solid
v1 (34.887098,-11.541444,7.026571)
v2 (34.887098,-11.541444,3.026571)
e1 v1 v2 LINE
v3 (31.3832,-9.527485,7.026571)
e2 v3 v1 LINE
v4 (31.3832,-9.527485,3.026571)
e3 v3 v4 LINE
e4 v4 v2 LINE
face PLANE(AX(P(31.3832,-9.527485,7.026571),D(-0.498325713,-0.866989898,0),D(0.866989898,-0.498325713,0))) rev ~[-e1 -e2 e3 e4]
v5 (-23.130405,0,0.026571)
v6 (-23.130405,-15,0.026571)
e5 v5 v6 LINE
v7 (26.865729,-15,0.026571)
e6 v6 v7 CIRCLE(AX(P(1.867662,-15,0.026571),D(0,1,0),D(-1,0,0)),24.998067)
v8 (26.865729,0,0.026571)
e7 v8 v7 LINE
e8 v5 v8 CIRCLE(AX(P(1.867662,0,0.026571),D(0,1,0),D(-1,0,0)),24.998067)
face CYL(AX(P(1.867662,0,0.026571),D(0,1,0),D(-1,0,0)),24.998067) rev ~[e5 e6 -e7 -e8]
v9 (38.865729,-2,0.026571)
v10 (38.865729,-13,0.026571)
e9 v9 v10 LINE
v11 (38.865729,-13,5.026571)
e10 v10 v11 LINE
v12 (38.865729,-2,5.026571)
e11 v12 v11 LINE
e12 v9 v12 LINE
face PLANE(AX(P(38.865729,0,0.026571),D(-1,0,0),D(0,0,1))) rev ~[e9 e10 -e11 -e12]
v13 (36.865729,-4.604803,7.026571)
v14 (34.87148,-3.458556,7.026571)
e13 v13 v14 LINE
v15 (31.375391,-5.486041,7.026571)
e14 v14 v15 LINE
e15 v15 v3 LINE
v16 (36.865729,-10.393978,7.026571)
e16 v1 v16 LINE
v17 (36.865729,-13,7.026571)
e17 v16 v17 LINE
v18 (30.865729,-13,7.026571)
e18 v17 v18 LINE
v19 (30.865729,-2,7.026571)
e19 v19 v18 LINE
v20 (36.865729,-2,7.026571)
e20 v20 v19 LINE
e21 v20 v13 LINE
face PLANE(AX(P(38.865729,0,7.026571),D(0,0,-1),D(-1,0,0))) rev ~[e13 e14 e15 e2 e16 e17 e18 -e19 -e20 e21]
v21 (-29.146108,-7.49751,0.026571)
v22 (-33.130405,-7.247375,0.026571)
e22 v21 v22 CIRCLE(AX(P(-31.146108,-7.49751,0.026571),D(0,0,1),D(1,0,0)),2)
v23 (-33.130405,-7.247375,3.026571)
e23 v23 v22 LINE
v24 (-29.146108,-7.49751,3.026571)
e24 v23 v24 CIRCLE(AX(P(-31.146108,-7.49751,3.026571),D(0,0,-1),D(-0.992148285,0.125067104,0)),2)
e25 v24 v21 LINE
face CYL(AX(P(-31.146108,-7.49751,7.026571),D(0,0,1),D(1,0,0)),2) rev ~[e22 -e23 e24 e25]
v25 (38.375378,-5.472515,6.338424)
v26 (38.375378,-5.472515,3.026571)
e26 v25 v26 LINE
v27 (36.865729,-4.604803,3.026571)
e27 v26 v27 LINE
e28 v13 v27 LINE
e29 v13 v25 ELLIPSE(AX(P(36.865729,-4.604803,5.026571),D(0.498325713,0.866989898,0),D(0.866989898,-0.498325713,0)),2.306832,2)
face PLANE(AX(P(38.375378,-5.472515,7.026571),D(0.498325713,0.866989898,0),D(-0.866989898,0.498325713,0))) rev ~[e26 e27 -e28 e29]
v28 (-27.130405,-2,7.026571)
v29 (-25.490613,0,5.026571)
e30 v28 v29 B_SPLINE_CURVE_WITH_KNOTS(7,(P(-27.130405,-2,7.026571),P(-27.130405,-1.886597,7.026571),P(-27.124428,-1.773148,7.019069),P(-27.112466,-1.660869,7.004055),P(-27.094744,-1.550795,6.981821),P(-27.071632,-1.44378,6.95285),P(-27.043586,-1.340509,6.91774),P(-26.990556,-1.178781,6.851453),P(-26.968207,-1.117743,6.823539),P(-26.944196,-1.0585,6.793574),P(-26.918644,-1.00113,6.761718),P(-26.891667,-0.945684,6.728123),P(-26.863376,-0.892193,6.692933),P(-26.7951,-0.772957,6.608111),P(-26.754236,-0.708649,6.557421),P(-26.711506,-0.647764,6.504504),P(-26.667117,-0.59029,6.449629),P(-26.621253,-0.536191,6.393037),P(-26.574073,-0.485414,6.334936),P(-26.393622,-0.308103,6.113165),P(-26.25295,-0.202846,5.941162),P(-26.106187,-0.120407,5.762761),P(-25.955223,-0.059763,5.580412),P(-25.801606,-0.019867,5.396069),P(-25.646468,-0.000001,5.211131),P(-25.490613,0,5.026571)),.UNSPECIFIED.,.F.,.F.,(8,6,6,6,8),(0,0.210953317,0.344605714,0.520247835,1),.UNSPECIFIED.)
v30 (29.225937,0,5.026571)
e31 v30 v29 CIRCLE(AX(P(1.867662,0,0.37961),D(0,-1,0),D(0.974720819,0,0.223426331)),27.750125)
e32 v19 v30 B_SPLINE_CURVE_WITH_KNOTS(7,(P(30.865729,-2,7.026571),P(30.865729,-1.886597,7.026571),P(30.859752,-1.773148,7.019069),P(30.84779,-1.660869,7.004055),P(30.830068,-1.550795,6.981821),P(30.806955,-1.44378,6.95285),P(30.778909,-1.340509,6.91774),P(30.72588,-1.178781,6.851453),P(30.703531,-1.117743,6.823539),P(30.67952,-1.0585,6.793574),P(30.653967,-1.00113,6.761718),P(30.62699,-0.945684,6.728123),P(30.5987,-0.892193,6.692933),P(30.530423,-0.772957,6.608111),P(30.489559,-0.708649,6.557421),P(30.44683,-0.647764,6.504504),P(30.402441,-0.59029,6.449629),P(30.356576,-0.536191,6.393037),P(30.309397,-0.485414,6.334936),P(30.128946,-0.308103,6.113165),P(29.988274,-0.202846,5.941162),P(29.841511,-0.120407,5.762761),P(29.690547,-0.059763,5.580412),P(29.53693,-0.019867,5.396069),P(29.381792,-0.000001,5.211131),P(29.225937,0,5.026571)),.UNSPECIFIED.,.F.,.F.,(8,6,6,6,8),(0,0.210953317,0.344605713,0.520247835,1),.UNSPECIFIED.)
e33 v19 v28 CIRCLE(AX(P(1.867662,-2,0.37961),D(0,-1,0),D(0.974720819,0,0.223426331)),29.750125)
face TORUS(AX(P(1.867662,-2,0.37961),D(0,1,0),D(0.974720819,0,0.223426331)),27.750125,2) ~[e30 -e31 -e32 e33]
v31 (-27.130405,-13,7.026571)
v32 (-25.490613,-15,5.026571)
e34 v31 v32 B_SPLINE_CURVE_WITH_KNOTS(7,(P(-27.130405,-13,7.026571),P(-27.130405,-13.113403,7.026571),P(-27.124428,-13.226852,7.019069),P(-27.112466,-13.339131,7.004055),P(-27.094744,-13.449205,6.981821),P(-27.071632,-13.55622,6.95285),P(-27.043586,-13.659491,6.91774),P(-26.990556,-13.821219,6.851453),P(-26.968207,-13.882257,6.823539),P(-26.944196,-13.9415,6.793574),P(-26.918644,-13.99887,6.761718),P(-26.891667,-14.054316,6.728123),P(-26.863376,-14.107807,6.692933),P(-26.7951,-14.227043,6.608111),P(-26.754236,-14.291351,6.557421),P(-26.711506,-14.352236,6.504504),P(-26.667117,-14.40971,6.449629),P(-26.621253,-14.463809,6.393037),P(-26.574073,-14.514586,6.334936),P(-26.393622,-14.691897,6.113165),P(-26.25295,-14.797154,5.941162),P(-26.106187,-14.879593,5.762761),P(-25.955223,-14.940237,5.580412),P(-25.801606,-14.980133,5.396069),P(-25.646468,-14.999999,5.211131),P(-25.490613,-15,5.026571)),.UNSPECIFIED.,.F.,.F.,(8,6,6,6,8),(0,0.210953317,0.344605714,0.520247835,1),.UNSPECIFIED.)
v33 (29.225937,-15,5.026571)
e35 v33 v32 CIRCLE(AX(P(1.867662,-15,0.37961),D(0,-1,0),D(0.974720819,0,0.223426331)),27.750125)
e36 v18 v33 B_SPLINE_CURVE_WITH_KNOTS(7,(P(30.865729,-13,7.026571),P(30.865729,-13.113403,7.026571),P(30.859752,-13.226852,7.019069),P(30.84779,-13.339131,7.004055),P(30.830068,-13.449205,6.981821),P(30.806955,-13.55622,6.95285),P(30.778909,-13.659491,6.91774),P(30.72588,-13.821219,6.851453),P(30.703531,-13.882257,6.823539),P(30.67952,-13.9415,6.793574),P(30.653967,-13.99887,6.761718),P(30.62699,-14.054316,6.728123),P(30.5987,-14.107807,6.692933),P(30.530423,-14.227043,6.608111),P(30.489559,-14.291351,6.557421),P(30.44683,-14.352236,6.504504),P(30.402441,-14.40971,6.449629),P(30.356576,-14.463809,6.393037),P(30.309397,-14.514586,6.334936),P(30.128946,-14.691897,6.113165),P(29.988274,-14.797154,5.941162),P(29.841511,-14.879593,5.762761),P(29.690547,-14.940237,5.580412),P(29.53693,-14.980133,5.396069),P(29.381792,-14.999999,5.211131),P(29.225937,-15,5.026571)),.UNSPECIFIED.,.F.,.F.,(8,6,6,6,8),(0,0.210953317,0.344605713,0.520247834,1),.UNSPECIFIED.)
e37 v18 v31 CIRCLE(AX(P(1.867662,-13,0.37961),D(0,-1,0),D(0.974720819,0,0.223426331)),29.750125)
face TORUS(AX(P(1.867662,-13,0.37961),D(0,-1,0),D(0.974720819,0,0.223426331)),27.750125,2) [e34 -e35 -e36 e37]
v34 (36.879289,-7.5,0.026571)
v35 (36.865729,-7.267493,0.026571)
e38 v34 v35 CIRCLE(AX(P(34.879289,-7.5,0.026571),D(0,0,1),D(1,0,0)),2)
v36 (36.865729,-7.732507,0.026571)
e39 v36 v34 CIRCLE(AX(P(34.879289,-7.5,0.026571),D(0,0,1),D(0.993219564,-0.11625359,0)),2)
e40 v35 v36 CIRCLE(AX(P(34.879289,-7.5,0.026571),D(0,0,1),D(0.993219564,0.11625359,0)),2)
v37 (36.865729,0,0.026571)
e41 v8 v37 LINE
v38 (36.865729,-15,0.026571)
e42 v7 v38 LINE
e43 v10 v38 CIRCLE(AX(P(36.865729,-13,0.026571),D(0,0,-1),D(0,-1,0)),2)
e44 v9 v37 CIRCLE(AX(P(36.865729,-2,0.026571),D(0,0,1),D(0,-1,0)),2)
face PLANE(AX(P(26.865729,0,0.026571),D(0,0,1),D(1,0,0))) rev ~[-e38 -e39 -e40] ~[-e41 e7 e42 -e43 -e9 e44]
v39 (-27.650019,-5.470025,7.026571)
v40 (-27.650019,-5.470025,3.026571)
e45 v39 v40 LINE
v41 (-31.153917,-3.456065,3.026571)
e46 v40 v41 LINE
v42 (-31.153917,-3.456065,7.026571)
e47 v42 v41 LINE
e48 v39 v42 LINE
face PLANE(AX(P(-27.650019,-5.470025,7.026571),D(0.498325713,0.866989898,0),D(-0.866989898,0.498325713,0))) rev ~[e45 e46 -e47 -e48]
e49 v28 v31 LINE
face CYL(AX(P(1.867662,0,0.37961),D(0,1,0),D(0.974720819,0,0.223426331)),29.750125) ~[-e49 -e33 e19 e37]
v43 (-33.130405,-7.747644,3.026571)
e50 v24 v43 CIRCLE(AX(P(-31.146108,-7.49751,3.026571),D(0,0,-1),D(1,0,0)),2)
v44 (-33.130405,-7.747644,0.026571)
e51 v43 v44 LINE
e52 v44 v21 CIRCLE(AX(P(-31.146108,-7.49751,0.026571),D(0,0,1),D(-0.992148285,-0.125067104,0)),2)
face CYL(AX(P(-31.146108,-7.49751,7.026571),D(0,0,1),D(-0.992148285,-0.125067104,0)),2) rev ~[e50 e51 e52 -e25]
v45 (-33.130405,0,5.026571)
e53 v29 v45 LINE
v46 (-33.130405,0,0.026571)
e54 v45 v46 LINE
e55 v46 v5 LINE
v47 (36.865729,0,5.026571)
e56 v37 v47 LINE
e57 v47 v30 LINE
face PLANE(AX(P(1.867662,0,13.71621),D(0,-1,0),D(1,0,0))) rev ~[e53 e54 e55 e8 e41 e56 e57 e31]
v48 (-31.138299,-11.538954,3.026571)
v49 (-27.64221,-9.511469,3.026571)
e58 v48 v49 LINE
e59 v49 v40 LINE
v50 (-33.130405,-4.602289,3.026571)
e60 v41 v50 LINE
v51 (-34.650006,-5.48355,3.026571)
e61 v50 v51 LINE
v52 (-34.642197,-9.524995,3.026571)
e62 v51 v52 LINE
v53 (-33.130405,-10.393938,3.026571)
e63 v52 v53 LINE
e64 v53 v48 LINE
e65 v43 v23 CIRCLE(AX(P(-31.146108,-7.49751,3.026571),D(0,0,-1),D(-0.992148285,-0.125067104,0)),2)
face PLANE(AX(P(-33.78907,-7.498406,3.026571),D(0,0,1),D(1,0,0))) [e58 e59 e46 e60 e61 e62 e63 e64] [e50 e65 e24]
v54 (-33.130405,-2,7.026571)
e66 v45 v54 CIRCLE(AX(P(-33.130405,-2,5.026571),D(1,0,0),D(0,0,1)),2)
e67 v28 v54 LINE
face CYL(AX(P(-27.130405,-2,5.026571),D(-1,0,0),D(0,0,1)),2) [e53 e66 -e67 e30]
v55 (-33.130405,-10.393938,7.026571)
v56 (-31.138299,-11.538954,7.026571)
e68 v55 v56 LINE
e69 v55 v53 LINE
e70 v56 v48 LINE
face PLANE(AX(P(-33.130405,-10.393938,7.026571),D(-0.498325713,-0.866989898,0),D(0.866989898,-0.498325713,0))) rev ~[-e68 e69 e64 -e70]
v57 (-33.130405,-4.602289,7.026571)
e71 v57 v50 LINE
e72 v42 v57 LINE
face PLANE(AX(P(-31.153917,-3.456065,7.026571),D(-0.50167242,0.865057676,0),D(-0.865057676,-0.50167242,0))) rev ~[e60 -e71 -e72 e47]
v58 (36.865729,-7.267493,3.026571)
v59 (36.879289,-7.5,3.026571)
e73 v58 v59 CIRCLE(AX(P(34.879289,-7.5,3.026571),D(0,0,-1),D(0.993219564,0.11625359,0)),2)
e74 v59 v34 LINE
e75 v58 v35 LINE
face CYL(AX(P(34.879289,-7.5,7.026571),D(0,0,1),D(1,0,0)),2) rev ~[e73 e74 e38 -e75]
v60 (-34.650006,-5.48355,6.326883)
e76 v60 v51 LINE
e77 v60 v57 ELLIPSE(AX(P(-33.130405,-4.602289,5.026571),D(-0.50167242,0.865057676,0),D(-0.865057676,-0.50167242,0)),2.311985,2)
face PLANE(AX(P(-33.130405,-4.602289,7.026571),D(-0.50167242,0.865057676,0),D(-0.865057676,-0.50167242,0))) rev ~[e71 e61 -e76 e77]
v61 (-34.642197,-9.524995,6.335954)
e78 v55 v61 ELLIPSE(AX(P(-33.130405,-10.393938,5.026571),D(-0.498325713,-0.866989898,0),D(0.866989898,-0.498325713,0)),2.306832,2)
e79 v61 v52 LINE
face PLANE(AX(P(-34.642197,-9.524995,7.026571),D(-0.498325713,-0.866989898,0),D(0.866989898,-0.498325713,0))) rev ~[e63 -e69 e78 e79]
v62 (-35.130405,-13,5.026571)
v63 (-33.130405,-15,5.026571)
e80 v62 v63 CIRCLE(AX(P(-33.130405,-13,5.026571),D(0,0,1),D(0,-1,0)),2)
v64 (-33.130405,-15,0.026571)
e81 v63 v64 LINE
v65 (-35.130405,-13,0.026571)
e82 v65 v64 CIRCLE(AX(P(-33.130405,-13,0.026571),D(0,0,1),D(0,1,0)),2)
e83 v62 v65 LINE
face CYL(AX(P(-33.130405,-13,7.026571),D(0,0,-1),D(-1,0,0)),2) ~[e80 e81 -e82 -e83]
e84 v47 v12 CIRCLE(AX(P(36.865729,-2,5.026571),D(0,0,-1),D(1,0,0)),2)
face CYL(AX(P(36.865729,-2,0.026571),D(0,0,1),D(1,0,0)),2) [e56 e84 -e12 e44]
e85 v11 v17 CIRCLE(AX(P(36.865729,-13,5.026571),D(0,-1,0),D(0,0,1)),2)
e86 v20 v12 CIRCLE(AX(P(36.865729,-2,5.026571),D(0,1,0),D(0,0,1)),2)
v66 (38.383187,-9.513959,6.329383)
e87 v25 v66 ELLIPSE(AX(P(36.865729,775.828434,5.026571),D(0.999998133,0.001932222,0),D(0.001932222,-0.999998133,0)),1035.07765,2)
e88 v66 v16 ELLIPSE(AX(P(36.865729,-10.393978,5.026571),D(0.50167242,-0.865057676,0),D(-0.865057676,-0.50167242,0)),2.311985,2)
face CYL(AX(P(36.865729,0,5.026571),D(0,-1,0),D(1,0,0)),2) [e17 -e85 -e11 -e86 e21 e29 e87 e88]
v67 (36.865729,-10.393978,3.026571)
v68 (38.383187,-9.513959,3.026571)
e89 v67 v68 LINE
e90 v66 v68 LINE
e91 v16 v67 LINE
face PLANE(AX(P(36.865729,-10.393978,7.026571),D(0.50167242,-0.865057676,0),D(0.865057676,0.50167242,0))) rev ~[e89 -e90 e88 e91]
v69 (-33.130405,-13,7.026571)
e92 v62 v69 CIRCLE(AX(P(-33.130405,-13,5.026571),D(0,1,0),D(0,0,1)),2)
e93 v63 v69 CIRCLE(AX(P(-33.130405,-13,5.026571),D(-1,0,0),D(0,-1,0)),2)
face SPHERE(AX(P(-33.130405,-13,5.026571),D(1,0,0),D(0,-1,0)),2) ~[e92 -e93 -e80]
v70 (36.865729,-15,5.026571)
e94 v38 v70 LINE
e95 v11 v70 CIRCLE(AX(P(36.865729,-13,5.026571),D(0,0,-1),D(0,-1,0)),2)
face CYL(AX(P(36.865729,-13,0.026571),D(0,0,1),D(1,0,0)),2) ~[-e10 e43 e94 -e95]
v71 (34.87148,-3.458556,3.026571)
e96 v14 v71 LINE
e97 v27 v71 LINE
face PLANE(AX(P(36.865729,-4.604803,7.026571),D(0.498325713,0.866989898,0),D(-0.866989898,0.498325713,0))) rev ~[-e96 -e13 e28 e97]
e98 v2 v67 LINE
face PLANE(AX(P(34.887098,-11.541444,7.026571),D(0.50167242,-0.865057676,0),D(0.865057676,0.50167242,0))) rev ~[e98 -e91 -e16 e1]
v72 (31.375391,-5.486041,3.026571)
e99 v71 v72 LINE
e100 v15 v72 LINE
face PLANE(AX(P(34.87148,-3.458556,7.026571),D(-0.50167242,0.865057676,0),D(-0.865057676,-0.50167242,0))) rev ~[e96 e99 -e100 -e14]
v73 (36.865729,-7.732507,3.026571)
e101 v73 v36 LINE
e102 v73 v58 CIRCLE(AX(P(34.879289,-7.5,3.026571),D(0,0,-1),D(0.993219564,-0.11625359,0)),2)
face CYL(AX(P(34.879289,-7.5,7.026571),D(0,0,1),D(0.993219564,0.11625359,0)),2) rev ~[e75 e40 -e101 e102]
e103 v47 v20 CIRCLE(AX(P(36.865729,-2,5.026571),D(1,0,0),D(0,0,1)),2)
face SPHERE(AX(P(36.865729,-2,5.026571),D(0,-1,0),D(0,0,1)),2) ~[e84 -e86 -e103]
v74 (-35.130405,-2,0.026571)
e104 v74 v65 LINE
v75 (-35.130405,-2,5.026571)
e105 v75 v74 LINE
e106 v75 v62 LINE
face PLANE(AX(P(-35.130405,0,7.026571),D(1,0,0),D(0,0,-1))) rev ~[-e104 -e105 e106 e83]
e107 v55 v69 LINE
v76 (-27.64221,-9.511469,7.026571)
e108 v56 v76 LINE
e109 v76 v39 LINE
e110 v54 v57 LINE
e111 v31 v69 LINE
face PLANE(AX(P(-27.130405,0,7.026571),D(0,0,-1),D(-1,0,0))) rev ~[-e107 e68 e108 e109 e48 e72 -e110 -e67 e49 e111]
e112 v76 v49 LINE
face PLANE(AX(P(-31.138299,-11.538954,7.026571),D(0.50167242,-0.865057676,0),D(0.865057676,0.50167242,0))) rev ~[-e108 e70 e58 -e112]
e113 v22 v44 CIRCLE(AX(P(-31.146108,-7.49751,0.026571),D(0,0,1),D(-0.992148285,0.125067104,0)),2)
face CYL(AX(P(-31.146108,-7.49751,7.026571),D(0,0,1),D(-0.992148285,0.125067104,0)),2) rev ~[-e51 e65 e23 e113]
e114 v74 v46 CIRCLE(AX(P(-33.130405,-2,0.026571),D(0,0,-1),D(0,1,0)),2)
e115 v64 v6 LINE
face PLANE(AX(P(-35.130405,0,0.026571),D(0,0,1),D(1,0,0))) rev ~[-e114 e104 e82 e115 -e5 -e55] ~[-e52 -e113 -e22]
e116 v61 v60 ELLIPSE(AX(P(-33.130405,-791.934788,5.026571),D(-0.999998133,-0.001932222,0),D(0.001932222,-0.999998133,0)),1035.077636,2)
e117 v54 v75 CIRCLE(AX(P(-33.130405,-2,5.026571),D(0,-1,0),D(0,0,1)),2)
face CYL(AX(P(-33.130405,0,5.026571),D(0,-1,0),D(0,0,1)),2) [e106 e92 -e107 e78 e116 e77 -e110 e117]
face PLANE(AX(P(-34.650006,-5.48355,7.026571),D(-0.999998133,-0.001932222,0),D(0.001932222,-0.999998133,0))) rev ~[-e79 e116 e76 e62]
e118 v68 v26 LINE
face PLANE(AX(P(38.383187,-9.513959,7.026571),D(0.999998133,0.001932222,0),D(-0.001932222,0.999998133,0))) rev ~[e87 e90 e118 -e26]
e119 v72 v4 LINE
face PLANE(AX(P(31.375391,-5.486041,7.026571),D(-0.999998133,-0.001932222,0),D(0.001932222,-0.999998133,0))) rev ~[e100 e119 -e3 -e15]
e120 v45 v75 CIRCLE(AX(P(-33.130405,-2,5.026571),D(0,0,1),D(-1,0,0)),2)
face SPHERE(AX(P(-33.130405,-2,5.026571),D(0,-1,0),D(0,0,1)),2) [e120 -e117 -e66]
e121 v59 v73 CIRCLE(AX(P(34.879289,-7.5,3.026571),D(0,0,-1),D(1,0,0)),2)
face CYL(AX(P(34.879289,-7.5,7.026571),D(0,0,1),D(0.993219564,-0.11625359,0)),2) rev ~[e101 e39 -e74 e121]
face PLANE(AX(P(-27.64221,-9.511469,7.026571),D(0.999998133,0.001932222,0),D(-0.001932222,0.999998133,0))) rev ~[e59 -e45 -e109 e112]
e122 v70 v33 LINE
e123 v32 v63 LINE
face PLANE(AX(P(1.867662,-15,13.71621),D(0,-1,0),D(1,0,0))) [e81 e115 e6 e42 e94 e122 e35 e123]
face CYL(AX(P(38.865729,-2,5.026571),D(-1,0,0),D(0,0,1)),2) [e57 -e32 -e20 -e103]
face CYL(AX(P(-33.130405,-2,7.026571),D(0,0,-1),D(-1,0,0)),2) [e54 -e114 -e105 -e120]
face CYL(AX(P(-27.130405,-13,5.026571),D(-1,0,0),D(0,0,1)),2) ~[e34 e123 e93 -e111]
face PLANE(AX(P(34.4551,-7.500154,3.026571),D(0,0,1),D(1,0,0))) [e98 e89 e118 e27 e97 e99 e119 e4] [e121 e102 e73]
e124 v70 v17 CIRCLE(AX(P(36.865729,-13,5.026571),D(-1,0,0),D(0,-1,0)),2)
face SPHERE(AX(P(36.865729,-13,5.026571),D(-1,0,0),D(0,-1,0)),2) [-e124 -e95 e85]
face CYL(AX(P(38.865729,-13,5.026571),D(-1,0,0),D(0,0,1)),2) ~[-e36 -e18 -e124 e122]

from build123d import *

# Parameters (mm, degrees)
F1_DEPTH  = 15
F2_R      = 2
F4_DEPTH  = 25
F5_DEPTH  = 4
F6_DEPTH  = 25
F8_DEPTH  = 25
F9_DEPTH  = 4
F10_DEPTH = 25


with BuildPart() as f1:
    # F0 (on Front) → F1 (new body)
    with BuildSketch(Plane.XZ):
        with BuildLine():
            ThreePointArc((-23.1304047869, 0.0265709655), (1.8676618749, 25.0246376273), (26.8657285366, 0.0265709655))
            Line((26.8657285366, 0.0265709655), (38.8657285366, 0.0265709655))
            Line((38.8657285366, 0.0265709655), (38.8657285366, 7.0265709655))
            Line((38.8657285366, 7.0265709655), (30.8657285366, 7.0265709655))
            ThreePointArc((30.8657285366, 7.0265709655), (1.8676618749, 30.1297350471), (-27.1304047869, 7.0265709655))
            Line((-27.1304047869, 7.0265709655), (-35.1304047869, 7.0265709655))
            Line((-35.1304047869, 7.0265709655), (-35.1304047869, 0.0265709655))
            Line((-35.1304047869, 0.0265709655), (-23.1304047869, 0.0265709655))
        make_face()
    extrude(amount=F1_DEPTH)

    # F2
    f2_edges = [f1.edges().sort_by_distance(p)[0] for p in [
        (1.867662, -15, 30.129735),
        (34.865729, -15, 7.026571),
        (38.865729, -15, 3.526571),
        (38.865729, -7.5, 7.026571),
        (-31.130405, -15, 7.026571),
        (-35.130405, -15, 3.526571),
        (-35.130405, -7.5, 7.026571),
        (1.867662, 0, 30.129735),
        (-31.130405, 0, 7.026571),
        (-35.130405, 0, 3.526571),
        (34.865729, 0, 7.026571),
        (38.865729, 0, 3.526571),
    ]]
    fillet(f2_edges, radius=F2_R)

    # F3 (on face) → F4 (cut)
    with BuildSketch(Plane.XY.offset(7.0265709655)):
        with BuildLine():
            ThreePointArc((36.8657285366, -7.7325071808), (36.875896312, -7.6164511554), (36.8792894082, -7.5))
            ThreePointArc((36.8792894082, -7.5), (36.875896312, -7.3835488446), (36.8657285366, -7.2674928192))
            Line((36.8657285366, -7.2674928192), (36.8657285366, -7.7325071808))
        make_face()
    extrude(amount=-F4_DEPTH, mode=Mode.SUBTRACT)

    # F3 (on face) → F5 (cut)
    with BuildSketch(Plane.XY.offset(7.0265709655)):
        with BuildLine():
            ThreePointArc((36.8657285366, -7.7325071808), (32.8792894082, -7.5), (36.8657285366, -7.2674928192))
            Line((36.8657285366, -7.2674928192), (36.8657285366, -4.6048032856))
            Line((36.8657285366, -4.6048032856), (34.8714804252, -3.45855566))
            Line((34.8714804252, -3.45855566), (31.3753914503, -5.4860406077))
            Line((31.3753914503, -5.4860406077), (31.3832004333, -9.5274849477))
            Line((31.3832004333, -9.5274849477), (34.8870983913, -11.54144434))
            Line((34.8870983913, -11.54144434), (36.8657285366, -10.3939784529))
            Line((36.8657285366, -10.3939784529), (36.8657285366, -7.7325071808))
        make_face()
        with BuildLine():
            ThreePointArc((36.8657285366, -7.2674928192), (36.875896312, -7.3835488446), (36.8792894082, -7.5))
            ThreePointArc((36.8792894082, -7.5), (36.875896312, -7.6164511554), (36.8657285366, -7.7325071808))
            Line((36.8657285366, -7.7325071808), (36.8657285366, -10.3939784529))
            Line((36.8657285366, -10.3939784529), (38.3831873661, -9.5139593923))
            Line((38.3831873661, -9.5139593923), (38.3753783831, -5.4725150523))
            Line((38.3753783831, -5.4725150523), (36.8657285366, -4.6048032856))
            Line((36.8657285366, -4.6048032856), (36.8657285366, -7.2674928192))
        make_face()
    extrude(amount=-F5_DEPTH, mode=Mode.SUBTRACT)

    # F3 (on face) → F6 (cut)
    with BuildSketch(Plane.XY.offset(7.0265709655)):
        with BuildLine():
            Line((36.8657285366, -7.7325071808), (36.8657285366, -7.2674928192))
            ThreePointArc((36.8657285366, -7.2674928192), (32.8792894082, -7.5), (36.8657285366, -7.7325071808))
        make_face()
    extrude(amount=-F6_DEPTH, mode=Mode.SUBTRACT)

    # F7 (on face) → F8 (cut)
    with BuildSketch(Plane.XY.offset(7.0265709655)):
        with BuildLine():
            ThreePointArc((-33.1304047869, -7.74764379), (-31.0207948898, -9.4935798639), (-29.1461082168, -7.4975095821))
            ThreePointArc((-29.1461082168, -7.4975095821), (-31.0207948898, -5.5014393002), (-33.1304047869, -7.2473753741))
            Line((-33.1304047869, -7.2473753741), (-33.1304047869, -7.74764379))
        make_face()
    extrude(amount=-F8_DEPTH, mode=Mode.SUBTRACT)

    # F7 (on face) → F9 (cut)
    with BuildSketch(Plane.XY.offset(7.0265709655)):
        with BuildLine():
            ThreePointArc((-33.1304047869, -7.74764379), (-33.1461082168, -7.4975095821), (-33.1304047869, -7.2473753741))
            Line((-33.1304047869, -7.2473753741), (-33.1304047869, -4.6022885965))
            Line((-33.1304047869, -4.6022885965), (-34.6500061748, -5.4835501898))
            Line((-34.6500061748, -5.4835501898), (-34.6421971917, -9.5249945298))
            Line((-34.6421971917, -9.5249945298), (-33.1304047869, -10.3939377894))
            Line((-33.1304047869, -10.3939377894), (-33.1304047869, -7.74764379))
        make_face()
        with BuildLine():
            ThreePointArc((-33.1304047869, -7.2473753741), (-31.0207948898, -5.5014393002), (-29.1461082168, -7.4975095821))
            ThreePointArc((-29.1461082168, -7.4975095821), (-31.0207948898, -9.4935798639), (-33.1304047869, -7.74764379))
            Line((-33.1304047869, -7.74764379), (-33.1304047869, -10.3939377894))
            Line((-33.1304047869, -10.3939377894), (-31.1382992338, -11.5389539221))
            Line((-31.1382992338, -11.5389539221), (-27.6422102589, -9.5114689744))
            Line((-27.6422102589, -9.5114689744), (-27.650019242, -5.4700246344))
            Line((-27.650019242, -5.4700246344), (-31.1539171999, -3.4560652421))
            Line((-31.1539171999, -3.4560652421), (-33.1304047869, -4.6022885965))
            Line((-33.1304047869, -4.6022885965), (-33.1304047869, -7.2473753741))
        make_face()
    extrude(amount=-F9_DEPTH, mode=Mode.SUBTRACT)

    # F7 (on face) → F10 (cut)
    with BuildSketch(Plane.XY.offset(7.0265709655)):
        with BuildLine():
            Line((-33.1304047869, -7.74764379), (-33.1304047869, -7.2473753741))
            ThreePointArc((-33.1304047869, -7.2473753741), (-33.1461082168, -7.4975095821), (-33.1304047869, -7.74764379))
        make_face()
    extrude(amount=-F10_DEPTH, mode=Mode.SUBTRACT)


solid = f1.part
